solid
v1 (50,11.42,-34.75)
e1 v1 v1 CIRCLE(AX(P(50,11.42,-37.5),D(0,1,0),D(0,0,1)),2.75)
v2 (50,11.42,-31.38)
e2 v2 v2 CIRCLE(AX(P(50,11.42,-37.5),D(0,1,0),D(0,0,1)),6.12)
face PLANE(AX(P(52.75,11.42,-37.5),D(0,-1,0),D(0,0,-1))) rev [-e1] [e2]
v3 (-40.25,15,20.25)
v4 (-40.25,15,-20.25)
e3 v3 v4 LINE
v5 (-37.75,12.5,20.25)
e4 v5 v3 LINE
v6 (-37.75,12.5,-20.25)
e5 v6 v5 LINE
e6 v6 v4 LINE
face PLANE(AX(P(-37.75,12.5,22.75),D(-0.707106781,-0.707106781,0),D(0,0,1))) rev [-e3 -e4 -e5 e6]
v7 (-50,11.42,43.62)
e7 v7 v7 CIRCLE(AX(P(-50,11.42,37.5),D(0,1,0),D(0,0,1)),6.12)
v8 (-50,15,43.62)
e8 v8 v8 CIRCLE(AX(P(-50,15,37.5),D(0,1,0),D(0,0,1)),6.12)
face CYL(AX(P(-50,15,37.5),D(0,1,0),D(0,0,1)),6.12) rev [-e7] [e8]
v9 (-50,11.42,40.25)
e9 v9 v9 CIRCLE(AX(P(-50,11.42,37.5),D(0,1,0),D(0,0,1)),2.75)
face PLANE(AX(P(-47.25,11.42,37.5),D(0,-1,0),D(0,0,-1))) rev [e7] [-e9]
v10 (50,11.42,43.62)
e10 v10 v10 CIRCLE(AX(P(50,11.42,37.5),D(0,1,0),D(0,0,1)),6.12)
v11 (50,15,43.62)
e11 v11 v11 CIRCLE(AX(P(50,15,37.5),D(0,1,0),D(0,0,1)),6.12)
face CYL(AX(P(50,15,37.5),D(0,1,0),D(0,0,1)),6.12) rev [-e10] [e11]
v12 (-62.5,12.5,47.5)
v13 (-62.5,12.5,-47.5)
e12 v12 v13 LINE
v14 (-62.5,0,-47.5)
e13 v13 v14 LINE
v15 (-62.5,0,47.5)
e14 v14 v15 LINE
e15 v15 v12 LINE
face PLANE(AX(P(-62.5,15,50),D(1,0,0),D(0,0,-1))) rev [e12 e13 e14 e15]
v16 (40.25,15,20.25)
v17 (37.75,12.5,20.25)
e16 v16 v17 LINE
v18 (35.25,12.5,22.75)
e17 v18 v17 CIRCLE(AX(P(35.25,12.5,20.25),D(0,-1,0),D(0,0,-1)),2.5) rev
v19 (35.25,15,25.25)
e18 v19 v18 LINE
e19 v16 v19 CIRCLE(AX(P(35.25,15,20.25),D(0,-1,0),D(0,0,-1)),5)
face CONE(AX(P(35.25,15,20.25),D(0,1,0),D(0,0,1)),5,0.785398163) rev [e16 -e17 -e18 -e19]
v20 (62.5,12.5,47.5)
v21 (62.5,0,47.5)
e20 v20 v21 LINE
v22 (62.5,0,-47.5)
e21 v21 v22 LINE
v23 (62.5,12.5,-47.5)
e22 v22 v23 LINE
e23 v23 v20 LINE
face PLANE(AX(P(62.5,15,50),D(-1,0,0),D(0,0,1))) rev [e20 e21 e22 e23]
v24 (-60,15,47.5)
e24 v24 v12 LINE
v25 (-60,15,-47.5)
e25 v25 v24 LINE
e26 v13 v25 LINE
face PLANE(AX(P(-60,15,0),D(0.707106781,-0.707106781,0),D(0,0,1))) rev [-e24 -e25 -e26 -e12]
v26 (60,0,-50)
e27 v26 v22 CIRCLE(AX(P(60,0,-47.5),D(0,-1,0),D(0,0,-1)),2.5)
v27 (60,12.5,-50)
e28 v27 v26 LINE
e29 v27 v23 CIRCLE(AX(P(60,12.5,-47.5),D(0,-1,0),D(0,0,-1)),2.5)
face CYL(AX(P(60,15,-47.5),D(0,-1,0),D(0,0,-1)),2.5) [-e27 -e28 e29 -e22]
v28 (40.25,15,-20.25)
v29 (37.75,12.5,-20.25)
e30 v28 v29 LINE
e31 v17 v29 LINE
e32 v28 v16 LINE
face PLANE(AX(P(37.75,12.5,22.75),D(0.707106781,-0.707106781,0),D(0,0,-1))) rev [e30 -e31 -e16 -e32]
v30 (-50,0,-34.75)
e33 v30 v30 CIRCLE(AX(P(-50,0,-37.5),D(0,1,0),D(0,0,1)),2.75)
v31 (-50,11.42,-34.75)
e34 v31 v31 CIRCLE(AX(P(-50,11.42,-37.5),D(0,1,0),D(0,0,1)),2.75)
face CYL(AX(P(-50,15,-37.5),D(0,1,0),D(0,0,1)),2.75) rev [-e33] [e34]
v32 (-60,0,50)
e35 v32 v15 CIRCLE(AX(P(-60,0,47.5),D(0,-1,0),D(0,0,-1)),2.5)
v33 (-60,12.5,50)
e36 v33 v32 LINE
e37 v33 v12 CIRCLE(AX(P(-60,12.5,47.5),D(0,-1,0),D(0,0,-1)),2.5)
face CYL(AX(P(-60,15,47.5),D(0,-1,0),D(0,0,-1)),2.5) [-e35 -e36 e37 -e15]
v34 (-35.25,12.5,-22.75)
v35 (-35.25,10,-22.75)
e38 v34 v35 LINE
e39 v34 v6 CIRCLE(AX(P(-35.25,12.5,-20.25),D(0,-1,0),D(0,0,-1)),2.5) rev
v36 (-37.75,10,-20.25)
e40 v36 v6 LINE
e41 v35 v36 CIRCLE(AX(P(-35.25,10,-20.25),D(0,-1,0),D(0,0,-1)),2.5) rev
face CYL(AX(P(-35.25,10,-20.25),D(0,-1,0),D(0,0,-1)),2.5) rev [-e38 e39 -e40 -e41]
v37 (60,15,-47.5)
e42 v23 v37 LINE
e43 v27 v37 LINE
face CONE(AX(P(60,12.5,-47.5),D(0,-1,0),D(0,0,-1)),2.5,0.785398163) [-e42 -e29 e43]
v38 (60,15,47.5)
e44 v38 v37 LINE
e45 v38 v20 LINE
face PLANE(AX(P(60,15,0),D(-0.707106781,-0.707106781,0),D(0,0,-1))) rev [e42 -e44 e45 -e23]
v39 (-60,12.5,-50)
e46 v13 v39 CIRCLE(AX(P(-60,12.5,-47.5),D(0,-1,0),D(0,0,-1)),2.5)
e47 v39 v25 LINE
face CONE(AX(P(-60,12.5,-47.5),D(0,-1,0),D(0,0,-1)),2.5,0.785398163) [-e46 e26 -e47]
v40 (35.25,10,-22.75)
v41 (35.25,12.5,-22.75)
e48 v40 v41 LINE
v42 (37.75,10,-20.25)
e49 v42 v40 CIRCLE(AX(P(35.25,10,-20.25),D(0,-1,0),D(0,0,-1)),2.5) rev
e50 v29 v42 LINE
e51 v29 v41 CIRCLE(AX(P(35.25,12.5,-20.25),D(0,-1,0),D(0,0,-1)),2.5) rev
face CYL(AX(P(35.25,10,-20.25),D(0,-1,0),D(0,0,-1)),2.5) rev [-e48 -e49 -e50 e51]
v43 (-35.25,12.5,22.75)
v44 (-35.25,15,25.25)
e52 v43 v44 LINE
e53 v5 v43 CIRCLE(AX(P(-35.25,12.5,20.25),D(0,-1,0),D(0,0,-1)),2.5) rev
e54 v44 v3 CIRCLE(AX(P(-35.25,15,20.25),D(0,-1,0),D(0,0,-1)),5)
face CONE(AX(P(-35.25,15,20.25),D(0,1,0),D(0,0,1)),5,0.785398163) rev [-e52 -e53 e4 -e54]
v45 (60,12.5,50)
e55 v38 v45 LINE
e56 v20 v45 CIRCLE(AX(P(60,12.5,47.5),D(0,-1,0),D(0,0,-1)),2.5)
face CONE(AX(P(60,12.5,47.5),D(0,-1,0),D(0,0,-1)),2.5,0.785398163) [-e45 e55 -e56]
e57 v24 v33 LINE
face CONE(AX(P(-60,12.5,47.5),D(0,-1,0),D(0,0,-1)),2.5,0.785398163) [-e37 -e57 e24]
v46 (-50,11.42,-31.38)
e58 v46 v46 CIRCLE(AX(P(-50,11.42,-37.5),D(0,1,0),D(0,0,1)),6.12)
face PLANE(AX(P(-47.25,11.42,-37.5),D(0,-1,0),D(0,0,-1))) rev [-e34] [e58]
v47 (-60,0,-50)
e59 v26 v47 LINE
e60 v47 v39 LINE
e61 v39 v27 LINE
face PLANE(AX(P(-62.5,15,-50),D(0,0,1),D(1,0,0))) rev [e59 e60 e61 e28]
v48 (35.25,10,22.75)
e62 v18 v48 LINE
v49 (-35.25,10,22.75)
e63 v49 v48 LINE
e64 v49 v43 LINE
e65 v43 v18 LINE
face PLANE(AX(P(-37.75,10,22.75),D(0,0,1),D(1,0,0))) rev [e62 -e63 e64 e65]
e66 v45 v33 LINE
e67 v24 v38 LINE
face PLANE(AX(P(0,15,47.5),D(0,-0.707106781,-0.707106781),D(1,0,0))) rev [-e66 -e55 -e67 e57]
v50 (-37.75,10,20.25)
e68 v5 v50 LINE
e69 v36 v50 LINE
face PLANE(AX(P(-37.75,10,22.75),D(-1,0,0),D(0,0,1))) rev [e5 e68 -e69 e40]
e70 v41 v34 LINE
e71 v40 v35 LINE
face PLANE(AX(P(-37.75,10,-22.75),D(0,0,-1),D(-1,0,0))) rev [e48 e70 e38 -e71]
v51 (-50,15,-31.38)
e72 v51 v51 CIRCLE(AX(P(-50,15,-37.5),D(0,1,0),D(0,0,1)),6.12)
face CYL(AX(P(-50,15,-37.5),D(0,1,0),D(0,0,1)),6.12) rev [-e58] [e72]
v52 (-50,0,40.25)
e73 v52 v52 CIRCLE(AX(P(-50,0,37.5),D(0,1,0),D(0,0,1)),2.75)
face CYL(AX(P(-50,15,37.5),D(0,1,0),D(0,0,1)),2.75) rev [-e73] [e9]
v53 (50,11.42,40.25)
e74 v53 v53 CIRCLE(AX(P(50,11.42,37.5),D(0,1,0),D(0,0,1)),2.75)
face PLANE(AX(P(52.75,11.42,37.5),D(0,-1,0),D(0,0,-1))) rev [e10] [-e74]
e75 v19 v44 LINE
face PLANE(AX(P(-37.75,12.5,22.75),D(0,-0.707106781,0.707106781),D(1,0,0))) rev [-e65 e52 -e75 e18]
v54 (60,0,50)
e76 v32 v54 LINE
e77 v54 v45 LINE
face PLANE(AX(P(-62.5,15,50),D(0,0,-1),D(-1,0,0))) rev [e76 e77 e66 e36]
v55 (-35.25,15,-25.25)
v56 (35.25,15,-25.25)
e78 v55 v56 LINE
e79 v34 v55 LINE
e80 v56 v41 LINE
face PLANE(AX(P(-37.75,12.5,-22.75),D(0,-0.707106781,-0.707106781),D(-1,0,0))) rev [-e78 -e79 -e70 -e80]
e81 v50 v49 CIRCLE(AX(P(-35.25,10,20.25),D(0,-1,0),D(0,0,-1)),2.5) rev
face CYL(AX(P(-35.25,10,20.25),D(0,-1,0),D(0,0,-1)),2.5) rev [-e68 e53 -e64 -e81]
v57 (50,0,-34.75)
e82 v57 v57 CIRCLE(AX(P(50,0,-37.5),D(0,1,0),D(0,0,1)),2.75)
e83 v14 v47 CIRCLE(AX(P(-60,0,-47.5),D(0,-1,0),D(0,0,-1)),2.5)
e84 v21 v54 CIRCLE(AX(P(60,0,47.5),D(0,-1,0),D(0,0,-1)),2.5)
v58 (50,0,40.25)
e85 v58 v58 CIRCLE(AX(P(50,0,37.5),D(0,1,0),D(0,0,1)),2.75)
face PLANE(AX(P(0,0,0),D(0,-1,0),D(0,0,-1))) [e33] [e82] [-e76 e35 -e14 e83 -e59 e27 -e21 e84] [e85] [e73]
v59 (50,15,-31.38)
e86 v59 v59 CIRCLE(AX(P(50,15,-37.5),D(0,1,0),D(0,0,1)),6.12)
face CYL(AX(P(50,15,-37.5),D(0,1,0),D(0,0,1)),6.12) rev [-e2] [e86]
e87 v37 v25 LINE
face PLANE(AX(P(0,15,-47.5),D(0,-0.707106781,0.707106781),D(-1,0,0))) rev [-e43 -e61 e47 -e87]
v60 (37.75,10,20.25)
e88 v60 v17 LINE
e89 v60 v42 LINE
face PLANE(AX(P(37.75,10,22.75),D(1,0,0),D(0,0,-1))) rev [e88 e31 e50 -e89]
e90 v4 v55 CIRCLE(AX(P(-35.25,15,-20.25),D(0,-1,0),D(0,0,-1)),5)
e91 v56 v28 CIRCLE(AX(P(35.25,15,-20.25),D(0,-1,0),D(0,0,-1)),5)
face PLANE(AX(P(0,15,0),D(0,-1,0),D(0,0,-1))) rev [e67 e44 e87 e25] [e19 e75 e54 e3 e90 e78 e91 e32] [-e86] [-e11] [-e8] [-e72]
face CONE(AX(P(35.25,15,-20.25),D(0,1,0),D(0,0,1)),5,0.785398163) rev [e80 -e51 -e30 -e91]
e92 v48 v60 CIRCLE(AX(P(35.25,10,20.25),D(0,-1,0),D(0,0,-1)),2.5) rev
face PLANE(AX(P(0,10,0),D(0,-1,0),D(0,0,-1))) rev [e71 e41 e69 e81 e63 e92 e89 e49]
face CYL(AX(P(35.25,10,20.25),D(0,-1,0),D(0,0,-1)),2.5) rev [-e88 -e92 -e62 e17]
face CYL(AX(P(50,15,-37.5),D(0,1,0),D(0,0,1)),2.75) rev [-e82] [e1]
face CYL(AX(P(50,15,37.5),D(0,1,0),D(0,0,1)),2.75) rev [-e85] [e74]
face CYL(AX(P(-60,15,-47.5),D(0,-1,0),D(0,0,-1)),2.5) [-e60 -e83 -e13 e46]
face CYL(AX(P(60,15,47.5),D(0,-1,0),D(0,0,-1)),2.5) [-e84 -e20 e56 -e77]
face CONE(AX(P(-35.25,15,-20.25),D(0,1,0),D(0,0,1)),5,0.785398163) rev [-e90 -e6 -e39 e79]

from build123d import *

# Parameters (mm, degrees)
SKETCH1_W                               = 125
SKETCH1_H                               = 100
BOSS_EXTRUDE1_DEPTH                     = 15
SKETCH2_W                               = 75.5
SKETCH2_H                               = 45.5
CUT_EXTRUDE1_DEPTH                      = 5
FILLET1_R                               = 2.5
CHAMFER2_SIZE                           = 2.5
CBORE_FOR_M5_HEX_HEAD_BOLT1_D           = 5.5
CBORE_FOR_M5_HEX_HEAD_BOLT1_CBORE_D     = 12.24
CBORE_FOR_M5_HEX_HEAD_BOLT1_CBORE_DEPTH = 3.58
LPATTERN2_COUNT                         = 2
LPATTERN2_PITCH                         = 75
LPATTERN2_COUNT_DIR2                    = 2
LPATTERN2_PITCH_DIR2                    = 100
FILLET2_R                               = 2.5
CHAMFER3_SIZE                           = 2.5


with BuildPart() as part:
    # Sketch1 → Boss-Extrude1 (new body)
    with BuildSketch(Plane(origin=(0, 0, 0), x_dir=(1, 0, 0), z_dir=(0, 1, 0))):
        Rectangle(SKETCH1_W, SKETCH1_H)
    extrude(amount=BOSS_EXTRUDE1_DEPTH)

    # Sketch2 → Cut-Extrude1 (cut)
    with BuildSketch(Plane(origin=(0, 15, 0), x_dir=(1, 0, 0), z_dir=(0, 1, 0))):
        Rectangle(SKETCH2_W, SKETCH2_H)
    extrude(amount=-CUT_EXTRUDE1_DEPTH, mode=Mode.SUBTRACT)

    # Fillet1
    fillet1_edges = [part.edges().sort_by_distance(p)[0] for p in [
        (37.75, 12.5, -22.75),
        (37.75, 12.5, 22.75),
        (-37.75, 12.5, 22.75),
        (-37.75, 12.5, -22.75),
    ]]
    fillet(fillet1_edges, radius=FILLET1_R)

    # Chamfer2
    chamfer2_edges = [part.edges().sort_by_distance(p)[0] for p in [
        (0, 15, 22.75),
        (-37.75, 15, 0),
        (37.75, 15, 0),
        (0, 15, -22.75),
        (-37.017766953, 15, 22.017766953),
        (37.017766953, 15, 22.017766953),
        (37.017766953, 15, -22.017766953),
        (-37.017766953, 15, -22.017766953),
    ]]
    chamfer(chamfer2_edges, length=CHAMFER2_SIZE)

    # CBORE for M5 Hex Head Bolt1 (through all)
    with Locations(Plane(origin=(0, 15, 0), x_dir=(1, 0, 0), z_dir=(0, 1, 0))):
        with Locations((50, 37.5)):
            cbore_for_m5_hex_head_bolt1 = CounterBoreHole(CBORE_FOR_M5_HEX_HEAD_BOLT1_D / 2, CBORE_FOR_M5_HEX_HEAD_BOLT1_CBORE_D / 2, CBORE_FOR_M5_HEX_HEAD_BOLT1_CBORE_DEPTH)

    # LPattern2: CBORE for M5 Hex Head Bolt1 2 × 2
    with Locations(*[(-j * LPATTERN2_PITCH_DIR2, 0, i * LPATTERN2_PITCH) for i in range(LPATTERN2_COUNT) for j in range(LPATTERN2_COUNT_DIR2) if (i, j) != (0, 0)]):
        add(cbore_for_m5_hex_head_bolt1, mode=Mode.SUBTRACT)

    # Fillet2
    fillet2_edges = [part.edges().sort_by_distance(p)[0] for p in [
        (62.5, 7.5, 50),
        (-62.5, 7.5, 50),
        (-62.5, 7.5, -50),
        (62.5, 7.5, -50),
    ]]
    fillet(fillet2_edges, radius=FILLET2_R)

    # Chamfer3
    chamfer3_edges = [part.edges().sort_by_distance(p)[0] for p in [
        (-62.5, 15, 0),
        (0, 15, -50),
        (62.5, 15, 0),
        (0, 15, 50),
        (-61.767766953, 15, 49.267766953),
        (61.767766953, 15, 49.267766953),
        (61.767766953, 15, -49.267766953),
        (-61.767766953, 15, -49.267766953),
    ]]
    chamfer(chamfer3_edges, length=CHAMFER3_SIZE - 0.0001)  # a hair under: the kernel refuses the full size


solid = part.part
